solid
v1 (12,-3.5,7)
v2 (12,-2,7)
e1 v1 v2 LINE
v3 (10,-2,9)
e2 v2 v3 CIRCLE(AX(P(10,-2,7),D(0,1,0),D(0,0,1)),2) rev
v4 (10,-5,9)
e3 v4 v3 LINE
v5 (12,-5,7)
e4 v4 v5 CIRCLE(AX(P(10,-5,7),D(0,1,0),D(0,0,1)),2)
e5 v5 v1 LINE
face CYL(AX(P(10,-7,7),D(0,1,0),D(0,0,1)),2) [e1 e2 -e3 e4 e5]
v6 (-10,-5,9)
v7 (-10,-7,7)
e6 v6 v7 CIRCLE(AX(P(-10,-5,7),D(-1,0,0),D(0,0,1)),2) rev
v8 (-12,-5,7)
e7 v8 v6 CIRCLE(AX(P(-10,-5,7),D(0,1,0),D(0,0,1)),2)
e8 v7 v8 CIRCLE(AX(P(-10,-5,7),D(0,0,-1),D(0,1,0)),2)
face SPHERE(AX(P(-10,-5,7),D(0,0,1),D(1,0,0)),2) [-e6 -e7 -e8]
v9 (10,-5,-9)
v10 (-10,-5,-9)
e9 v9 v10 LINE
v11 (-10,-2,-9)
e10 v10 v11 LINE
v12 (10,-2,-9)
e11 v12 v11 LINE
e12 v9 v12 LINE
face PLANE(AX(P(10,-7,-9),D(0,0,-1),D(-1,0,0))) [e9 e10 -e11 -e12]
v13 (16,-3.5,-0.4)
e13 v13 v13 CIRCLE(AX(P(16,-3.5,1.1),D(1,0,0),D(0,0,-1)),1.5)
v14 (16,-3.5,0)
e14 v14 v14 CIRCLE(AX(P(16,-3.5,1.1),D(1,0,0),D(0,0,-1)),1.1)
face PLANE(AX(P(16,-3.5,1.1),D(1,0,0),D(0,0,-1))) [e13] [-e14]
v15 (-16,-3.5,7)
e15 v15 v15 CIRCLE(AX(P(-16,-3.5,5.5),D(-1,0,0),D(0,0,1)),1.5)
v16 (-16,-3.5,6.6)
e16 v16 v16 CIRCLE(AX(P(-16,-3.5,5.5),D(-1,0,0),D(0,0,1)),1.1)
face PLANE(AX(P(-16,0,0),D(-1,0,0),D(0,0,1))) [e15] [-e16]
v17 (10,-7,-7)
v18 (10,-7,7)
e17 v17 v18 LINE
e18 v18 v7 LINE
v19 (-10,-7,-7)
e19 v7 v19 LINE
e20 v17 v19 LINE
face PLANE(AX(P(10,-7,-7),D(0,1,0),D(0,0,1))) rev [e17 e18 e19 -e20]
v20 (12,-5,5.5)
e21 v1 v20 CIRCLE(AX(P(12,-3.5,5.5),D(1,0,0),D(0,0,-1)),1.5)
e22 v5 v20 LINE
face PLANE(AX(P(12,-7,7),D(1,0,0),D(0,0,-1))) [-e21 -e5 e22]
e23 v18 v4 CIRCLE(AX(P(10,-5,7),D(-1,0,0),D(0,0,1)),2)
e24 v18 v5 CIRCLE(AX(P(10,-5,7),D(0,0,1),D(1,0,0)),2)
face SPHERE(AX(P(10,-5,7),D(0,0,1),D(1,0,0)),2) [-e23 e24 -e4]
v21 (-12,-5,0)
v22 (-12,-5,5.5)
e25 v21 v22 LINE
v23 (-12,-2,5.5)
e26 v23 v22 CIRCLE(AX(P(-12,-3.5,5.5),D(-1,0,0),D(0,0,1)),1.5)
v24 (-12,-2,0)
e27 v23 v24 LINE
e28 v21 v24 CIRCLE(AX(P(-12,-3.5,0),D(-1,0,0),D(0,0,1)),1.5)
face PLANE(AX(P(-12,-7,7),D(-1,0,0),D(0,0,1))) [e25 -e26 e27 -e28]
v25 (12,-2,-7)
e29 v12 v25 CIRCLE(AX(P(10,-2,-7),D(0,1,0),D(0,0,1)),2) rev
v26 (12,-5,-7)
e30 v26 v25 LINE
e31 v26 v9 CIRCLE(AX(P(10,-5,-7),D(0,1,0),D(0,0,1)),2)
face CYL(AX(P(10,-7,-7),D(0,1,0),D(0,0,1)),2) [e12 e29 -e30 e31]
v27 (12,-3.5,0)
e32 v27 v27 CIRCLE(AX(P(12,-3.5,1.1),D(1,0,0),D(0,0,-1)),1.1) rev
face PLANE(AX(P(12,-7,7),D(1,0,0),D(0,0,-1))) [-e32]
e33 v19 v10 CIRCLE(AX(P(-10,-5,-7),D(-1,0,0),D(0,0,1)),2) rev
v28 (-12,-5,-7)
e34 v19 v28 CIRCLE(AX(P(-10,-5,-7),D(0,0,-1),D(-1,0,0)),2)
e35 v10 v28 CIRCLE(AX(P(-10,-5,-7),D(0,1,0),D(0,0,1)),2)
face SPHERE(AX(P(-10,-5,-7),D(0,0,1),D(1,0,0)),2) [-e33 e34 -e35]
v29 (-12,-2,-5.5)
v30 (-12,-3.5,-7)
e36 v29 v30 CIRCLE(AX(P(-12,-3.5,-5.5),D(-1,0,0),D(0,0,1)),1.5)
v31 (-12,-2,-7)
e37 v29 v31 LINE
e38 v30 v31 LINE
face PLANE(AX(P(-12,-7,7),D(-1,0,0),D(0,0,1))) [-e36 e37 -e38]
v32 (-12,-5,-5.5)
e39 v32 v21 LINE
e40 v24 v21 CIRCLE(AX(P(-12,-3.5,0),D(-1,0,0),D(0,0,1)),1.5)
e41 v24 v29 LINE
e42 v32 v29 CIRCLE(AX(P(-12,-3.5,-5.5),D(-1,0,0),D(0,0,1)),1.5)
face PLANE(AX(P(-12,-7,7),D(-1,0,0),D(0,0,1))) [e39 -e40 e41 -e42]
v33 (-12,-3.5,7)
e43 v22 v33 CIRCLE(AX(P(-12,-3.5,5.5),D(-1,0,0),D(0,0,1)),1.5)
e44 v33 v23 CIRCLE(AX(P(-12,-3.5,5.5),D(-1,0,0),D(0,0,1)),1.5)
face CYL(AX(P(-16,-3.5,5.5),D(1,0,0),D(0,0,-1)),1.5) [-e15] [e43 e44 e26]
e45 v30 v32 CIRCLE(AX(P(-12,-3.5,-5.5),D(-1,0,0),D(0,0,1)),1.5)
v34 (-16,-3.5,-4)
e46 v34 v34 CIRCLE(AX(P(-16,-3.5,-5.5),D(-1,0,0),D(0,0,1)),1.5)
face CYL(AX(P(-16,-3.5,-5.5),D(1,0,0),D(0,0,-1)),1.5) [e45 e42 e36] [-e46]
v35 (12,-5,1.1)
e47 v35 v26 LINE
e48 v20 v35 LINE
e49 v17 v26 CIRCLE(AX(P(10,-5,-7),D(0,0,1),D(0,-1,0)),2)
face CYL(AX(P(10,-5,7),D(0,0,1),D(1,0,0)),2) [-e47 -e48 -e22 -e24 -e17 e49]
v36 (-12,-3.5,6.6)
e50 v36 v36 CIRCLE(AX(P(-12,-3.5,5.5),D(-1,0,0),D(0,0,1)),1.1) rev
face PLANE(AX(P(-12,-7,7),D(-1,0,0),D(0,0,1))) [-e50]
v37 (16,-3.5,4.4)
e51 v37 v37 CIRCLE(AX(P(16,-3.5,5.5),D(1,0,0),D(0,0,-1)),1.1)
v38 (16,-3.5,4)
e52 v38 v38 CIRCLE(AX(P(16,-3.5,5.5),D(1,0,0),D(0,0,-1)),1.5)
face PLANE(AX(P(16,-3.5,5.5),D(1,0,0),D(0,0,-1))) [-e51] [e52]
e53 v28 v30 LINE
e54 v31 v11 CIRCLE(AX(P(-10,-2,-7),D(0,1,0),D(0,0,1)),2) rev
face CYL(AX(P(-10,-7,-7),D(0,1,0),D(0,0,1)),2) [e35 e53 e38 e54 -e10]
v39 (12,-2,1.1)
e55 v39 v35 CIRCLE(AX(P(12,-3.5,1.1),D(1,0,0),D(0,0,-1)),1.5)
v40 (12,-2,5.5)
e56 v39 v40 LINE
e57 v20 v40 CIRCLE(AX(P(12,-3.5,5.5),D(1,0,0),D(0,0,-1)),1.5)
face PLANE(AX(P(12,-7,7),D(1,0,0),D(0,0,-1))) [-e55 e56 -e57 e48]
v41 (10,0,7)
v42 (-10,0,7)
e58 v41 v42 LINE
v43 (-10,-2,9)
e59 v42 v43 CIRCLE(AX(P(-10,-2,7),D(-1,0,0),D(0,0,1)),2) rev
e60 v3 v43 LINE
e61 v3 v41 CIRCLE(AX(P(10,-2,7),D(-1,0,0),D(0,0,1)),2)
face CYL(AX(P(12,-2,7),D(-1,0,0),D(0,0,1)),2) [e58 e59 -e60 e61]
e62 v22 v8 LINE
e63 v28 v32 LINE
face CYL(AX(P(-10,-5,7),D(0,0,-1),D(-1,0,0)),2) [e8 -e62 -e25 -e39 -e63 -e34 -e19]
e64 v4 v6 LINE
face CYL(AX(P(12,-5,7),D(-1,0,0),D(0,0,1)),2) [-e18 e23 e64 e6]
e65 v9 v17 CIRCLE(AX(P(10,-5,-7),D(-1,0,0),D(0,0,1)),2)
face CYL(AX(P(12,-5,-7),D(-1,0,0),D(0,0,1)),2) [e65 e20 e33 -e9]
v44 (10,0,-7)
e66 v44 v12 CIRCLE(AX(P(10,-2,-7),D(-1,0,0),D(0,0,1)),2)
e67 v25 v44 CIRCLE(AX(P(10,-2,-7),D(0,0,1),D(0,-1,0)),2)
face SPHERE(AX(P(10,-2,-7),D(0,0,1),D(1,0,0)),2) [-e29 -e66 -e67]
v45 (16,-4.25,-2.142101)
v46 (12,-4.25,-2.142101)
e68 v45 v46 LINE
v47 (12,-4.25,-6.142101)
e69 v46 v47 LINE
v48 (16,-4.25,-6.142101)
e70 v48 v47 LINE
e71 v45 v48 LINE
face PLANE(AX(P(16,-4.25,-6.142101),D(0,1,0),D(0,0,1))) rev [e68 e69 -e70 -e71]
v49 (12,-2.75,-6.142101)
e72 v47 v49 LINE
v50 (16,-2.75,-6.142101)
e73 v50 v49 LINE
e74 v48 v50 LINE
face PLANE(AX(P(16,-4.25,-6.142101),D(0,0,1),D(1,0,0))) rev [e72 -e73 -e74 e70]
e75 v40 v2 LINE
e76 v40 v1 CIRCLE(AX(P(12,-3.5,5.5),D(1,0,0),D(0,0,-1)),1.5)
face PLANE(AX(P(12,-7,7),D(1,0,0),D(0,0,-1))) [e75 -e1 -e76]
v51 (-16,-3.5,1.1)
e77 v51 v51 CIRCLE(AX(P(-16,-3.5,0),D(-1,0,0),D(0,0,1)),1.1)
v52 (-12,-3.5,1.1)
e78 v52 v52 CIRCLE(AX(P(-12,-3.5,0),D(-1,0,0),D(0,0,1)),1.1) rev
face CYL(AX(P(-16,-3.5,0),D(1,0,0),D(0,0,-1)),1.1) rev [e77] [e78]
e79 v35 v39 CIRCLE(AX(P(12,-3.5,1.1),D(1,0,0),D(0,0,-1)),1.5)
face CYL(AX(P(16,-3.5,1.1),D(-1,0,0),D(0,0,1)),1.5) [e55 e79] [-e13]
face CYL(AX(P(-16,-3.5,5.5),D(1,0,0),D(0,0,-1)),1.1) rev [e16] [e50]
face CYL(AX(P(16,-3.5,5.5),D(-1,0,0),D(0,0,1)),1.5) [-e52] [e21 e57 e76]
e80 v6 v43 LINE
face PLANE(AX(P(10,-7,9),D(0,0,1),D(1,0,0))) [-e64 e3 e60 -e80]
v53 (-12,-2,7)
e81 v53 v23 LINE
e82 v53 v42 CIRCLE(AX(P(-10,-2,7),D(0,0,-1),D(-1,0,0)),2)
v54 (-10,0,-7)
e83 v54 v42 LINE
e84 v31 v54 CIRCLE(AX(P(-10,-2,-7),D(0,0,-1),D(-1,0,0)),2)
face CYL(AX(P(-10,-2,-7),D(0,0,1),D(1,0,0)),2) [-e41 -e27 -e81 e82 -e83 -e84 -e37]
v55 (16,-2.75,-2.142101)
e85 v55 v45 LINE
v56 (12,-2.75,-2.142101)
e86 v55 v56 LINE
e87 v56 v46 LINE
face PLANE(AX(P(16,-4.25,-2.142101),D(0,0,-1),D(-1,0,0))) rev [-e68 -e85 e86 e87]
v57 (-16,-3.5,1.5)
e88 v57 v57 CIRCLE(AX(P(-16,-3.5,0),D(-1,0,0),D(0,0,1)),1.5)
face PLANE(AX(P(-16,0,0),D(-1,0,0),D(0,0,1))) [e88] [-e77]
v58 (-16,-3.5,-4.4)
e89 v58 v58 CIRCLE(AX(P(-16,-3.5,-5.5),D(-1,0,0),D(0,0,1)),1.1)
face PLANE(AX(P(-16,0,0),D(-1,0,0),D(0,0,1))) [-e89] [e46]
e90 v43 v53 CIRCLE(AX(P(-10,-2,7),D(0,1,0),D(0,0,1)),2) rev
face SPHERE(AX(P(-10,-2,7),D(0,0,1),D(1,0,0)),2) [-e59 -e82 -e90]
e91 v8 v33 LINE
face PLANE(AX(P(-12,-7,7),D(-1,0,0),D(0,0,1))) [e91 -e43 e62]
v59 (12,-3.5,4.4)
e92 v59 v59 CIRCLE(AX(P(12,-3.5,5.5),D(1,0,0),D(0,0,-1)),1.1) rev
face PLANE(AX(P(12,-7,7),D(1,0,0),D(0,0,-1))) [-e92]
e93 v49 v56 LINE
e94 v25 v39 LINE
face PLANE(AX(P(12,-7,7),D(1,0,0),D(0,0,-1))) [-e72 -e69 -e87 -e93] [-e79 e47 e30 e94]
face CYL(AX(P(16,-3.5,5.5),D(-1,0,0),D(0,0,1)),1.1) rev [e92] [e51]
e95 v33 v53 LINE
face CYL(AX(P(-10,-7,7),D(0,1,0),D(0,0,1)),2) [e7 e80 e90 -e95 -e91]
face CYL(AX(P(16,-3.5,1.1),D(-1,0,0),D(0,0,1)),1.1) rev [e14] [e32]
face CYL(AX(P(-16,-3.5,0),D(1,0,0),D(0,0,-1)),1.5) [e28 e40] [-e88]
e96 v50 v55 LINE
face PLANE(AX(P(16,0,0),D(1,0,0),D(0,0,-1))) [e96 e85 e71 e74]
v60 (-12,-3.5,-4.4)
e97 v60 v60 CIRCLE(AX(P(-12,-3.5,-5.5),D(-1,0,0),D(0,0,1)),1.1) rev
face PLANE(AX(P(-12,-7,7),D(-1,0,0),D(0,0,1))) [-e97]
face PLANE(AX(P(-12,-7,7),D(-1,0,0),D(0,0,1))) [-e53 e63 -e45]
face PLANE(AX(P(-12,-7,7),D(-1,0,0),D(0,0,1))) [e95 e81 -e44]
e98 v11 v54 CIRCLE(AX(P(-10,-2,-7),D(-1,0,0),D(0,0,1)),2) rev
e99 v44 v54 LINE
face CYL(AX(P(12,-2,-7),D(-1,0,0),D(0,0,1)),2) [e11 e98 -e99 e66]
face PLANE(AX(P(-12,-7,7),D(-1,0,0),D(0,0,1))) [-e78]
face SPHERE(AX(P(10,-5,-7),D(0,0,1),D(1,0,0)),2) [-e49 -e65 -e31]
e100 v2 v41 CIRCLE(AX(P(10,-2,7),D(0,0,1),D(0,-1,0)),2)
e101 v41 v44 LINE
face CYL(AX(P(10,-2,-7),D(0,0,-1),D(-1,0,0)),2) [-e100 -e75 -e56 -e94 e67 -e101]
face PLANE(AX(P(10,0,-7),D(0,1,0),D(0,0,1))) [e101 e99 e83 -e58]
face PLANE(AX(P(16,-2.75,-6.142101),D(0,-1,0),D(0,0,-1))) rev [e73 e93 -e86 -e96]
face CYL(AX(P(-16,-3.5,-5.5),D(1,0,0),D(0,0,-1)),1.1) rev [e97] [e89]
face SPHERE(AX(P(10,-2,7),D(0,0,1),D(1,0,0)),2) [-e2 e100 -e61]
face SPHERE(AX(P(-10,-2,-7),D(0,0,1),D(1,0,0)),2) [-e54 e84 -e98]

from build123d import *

# Parameters (mm, degrees)
BOSS_EXTRUDE1_DEPTH = 7
CUT_EXTRUDE3_DEPTH  = 27.570660511
SKETCH7_R           = 1.5
SKETCH7_R_2         = 1.1
BOSS_EXTRUDE3_DEPTH = 4
BOSS_EXTRUDE4_START = 4
SKETCH8_R           = 1.5
SKETCH8_R_2         = 1.1
SKETCH8_W           = 4
SKETCH8_H           = 1.5
BOSS_EXTRUDE4_DEPTH = 4
FILLET1_R           = 2


with BuildPart() as part:
    # Sketch1 → Boss-Extrude1 (new body)
    with BuildSketch(Plane(origin=(0, 0, 0), x_dir=(1, 0, 0), z_dir=(0, 1, 0))):
        with BuildLine():
            Line((10, -9), (-10, -9))
            ThreePointArc((-10, -9), (-11.414213562, -8.414213562), (-12, -7))
            Line((-12, -7), (-12, 7))
            ThreePointArc((-12, 7), (-11.414213562, 8.414213562), (-10, 9))
            Line((-10, 9), (10, 9))
            ThreePointArc((10, 9), (11.414213562, 8.414213562), (12, 7))
            Line((12, 7), (12, -7))
            ThreePointArc((12, -7), (11.414213562, -8.414213562), (10, -9))
        make_face()
    extrude(amount=-BOSS_EXTRUDE1_DEPTH)

    # Sketch5 → Cut-Extrude3 (cut, through all)
    with BuildSketch(Plane.ZY.offset(12)):
        with BuildLine():
            ThreePointArc((-7, 0), (-8.414213562, -0.585786438), (-9, -2))
            Line((-9, -2), (-9, 0))
            Line((-9, 0), (-7, 0))
        make_face()
        with BuildLine():
            ThreePointArc((-9, -5), (-8.414213562, -6.414213562), (-7, -7))
            Line((-7, -7), (-9, -7))
            Line((-9, -7), (-9, -5))
        make_face()
        with BuildLine():
            ThreePointArc((7, -7), (8.414213562, -6.414213562), (9, -5))
            Line((9, -5), (9, -7))
            Line((9, -7), (7, -7))
        make_face()
        with BuildLine():
            Line((7, 0), (9, 0))
            Line((9, 0), (9, -2))
            ThreePointArc((9, -2), (8.414213562, -0.585786438), (7, 0))
        make_face()
    extrude(amount=-CUT_EXTRUDE3_DEPTH, mode=Mode.SUBTRACT)

    # Sketch7 → Boss-Extrude3 (add)
    # profile 1 of 3: a face of its own
    with BuildSketch(Plane.ZY.offset(12)):
        with Locations(Location((-5.5, -3.5, 0), (0, 0, 180))):
            Circle(SKETCH7_R)
        with Locations((-5.5, -3.5)):
            Circle(SKETCH7_R_2, mode=Mode.SUBTRACT)
    # profile 2 of 3: a face of its own
    with BuildSketch(Plane.ZY.offset(12)):
        with Locations((0, -3.5)):
            Circle(SKETCH7_R)
        with Locations((0, -3.5)):
            Circle(SKETCH7_R_2, mode=Mode.SUBTRACT)
    # profile 3 of 3: a face of its own
    with BuildSketch(Plane.ZY.offset(12)):
        with Locations((5.5, -3.5)):
            Circle(SKETCH7_R)
        with Locations((5.5, -3.5)):
            Circle(SKETCH7_R_2, mode=Mode.SUBTRACT)
    extrude(amount=BOSS_EXTRUDE3_DEPTH)

    # Sketch8 → Boss-Extrude4 (add)
    # profile 1 of 3: a face of its own
    with BuildSketch(Plane(origin=(12, 0, 0), x_dir=(0, 0, -1), z_dir=(1, 0, 0)).offset(BOSS_EXTRUDE4_START)):
        with Locations(Location((-5.5, -3.5, 0), (0, 0, 180))):
            Circle(SKETCH8_R)
        with Locations(Location((-5.5, -3.5, 0), (0, 0, 180))):
            Circle(SKETCH8_R_2, mode=Mode.SUBTRACT)
    # profile 2 of 3: a face of its own
    with BuildSketch(Plane(origin=(12, 0, 0), x_dir=(0, 0, -1), z_dir=(1, 0, 0)).offset(BOSS_EXTRUDE4_START)):
        with Locations((-1.1, -3.5)):
            Circle(SKETCH8_R)
        with Locations((-1.1, -3.5)):
            Circle(SKETCH8_R_2, mode=Mode.SUBTRACT)
    # profile 3 of 3: a face of its own
    with BuildSketch(Plane(origin=(12, 0, 0), x_dir=(0, 0, -1), z_dir=(1, 0, 0)).offset(BOSS_EXTRUDE4_START)):
        with Locations((4.14210092, -3.5)):
            Rectangle(SKETCH8_W, SKETCH8_H)
    extrude(amount=-BOSS_EXTRUDE4_DEPTH)

    # Fillet1
    # the kernel refuses this fillet: 2 mm, written as the material it takes off along each edge
    with BuildSketch(Plane(origin=(10, -2, 7), x_dir=(1, 0, 0), z_dir=(0, 1, 0))) as fillet1_piece_1_section:
        Polygon((0, 0), (FILLET1_R, 0), (FILLET1_R, -FILLET1_R), (0, -FILLET1_R), align=None)
    fillet1_piece_1 = extrude(amount=FILLET1_R, mode=Mode.PRIVATE)
    fillet1_piece_1 = fillet1_piece_1 - Plane(origin=(10, -2, 7), x_dir=(-0.7071067811865475, 0, -0.7071067811865475), z_dir=(0, 1, 0)) * Sphere(FILLET1_R, mode=Mode.PRIVATE)
    add(fillet1_piece_1, mode=Mode.SUBTRACT)
    with BuildSketch(Plane(origin=(-10, -2, 7), x_dir=(-1, 0, 0), z_dir=(0, 1, 0))) as fillet1_piece_2_section:
        Polygon((0, 0), (FILLET1_R, 0), (FILLET1_R, FILLET1_R), (0, FILLET1_R), align=None)
    fillet1_piece_2 = extrude(amount=FILLET1_R, mode=Mode.PRIVATE)
    fillet1_piece_2 = fillet1_piece_2 - Plane(origin=(-10, -2, 7), x_dir=(0.7071067811865475, 0, -0.7071067811865475), z_dir=(0, 1, 0)) * Sphere(FILLET1_R, mode=Mode.PRIVATE)
    add(fillet1_piece_2, mode=Mode.SUBTRACT)
    with BuildSketch(Plane(origin=(10, -5, 7), x_dir=(1, 0, 0), z_dir=(0, -1, 0))) as fillet1_piece_3_section:
        Polygon((0, 0), (FILLET1_R, 0), (FILLET1_R, FILLET1_R), (0, FILLET1_R), align=None)
    fillet1_piece_3 = extrude(amount=FILLET1_R, mode=Mode.PRIVATE)
    fillet1_piece_3 = fillet1_piece_3 - Plane(origin=(10, -5, 7), x_dir=(-0.7071067811865475, 0, -0.7071067811865475), z_dir=(0, -1, 0)) * Sphere(FILLET1_R, mode=Mode.PRIVATE)
    add(fillet1_piece_3, mode=Mode.SUBTRACT)
    with BuildSketch(Plane(origin=(-10, -5, 7), x_dir=(0, -1, 0), z_dir=(-1, 0, 0))) as fillet1_piece_4_section:
        Polygon((0, 0), (FILLET1_R, 0), (FILLET1_R, FILLET1_R), (0, FILLET1_R), align=None)
    fillet1_piece_4 = extrude(amount=FILLET1_R, mode=Mode.PRIVATE)
    fillet1_piece_4 = fillet1_piece_4 - Plane(origin=(-10, -5, 7), x_dir=(0, 0.7071067811865475, -0.7071067811865475), z_dir=(-1, 0, 0)) * Sphere(FILLET1_R, mode=Mode.PRIVATE)
    add(fillet1_piece_4, mode=Mode.SUBTRACT)
    with BuildSketch(Plane(origin=(10, -5, -7), x_dir=(1, 0, 0), z_dir=(0, -1, 0))) as fillet1_piece_5_section:
        Polygon((0, 0), (FILLET1_R, 0), (FILLET1_R, -FILLET1_R), (0, -FILLET1_R), align=None)
    fillet1_piece_5 = extrude(amount=FILLET1_R, mode=Mode.PRIVATE)
    fillet1_piece_5 = fillet1_piece_5 - Plane(origin=(10, -5, -7), x_dir=(-0.7071067811865475, 0, 0.7071067811865476), z_dir=(0, -1, 0)) * Sphere(FILLET1_R, mode=Mode.PRIVATE)
    add(fillet1_piece_5, mode=Mode.SUBTRACT)
    with BuildSketch(Plane(origin=(-10, -5, -7), x_dir=(0, -1, 0), z_dir=(-1, 0, 0))) as fillet1_piece_6_section:
        Polygon((0, 0), (FILLET1_R, 0), (FILLET1_R, -FILLET1_R), (0, -FILLET1_R), align=None)
    fillet1_piece_6 = extrude(amount=FILLET1_R, mode=Mode.PRIVATE)
    fillet1_piece_6 = fillet1_piece_6 - Plane(origin=(-10, -5, -7), x_dir=(0, 0.7071067811865475, 0.7071067811865475), z_dir=(-1, 0, 0)) * Sphere(FILLET1_R, mode=Mode.PRIVATE)
    add(fillet1_piece_6, mode=Mode.SUBTRACT)
    with BuildSketch(Plane(origin=(10, -2, -7), x_dir=(1, 0, 0), z_dir=(0, 1, 0))) as fillet1_piece_7_section:
        Polygon((0, 0), (FILLET1_R, 0), (FILLET1_R, FILLET1_R), (0, FILLET1_R), align=None)
    fillet1_piece_7 = extrude(amount=FILLET1_R, mode=Mode.PRIVATE)
    fillet1_piece_7 = fillet1_piece_7 - Plane(origin=(10, -2, -7), x_dir=(-0.7071067811865475, 0, 0.7071067811865476), z_dir=(0, 1, 0)) * Sphere(FILLET1_R, mode=Mode.PRIVATE)
    add(fillet1_piece_7, mode=Mode.SUBTRACT)
    with BuildSketch(Plane(origin=(-10, -2, -7), x_dir=(-1, 0, 0), z_dir=(0, 1, 0))) as fillet1_piece_8_section:
        Polygon((0, 0), (FILLET1_R, 0), (FILLET1_R, -FILLET1_R), (0, -FILLET1_R), align=None)
    fillet1_piece_8 = extrude(amount=FILLET1_R, mode=Mode.PRIVATE)
    fillet1_piece_8 = fillet1_piece_8 - Plane(origin=(-10, -2, -7), x_dir=(0.7071067811865475, 0, 0.7071067811865475), z_dir=(0, 1, 0)) * Sphere(FILLET1_R, mode=Mode.PRIVATE)
    add(fillet1_piece_8, mode=Mode.SUBTRACT)
    with BuildSketch(Plane(origin=(-12, 0, 7), x_dir=(1, 0, 0), z_dir=(0, 0, -1)), Plane(origin=(-12, -7, 7), x_dir=(0, 1, 0), z_dir=(0, 0, -1)), Plane(origin=(12, 0, -7), x_dir=(-1, 0, 0), z_dir=(0, 0, 1))) as fillet1_piece_9:
        with BuildLine():
            CenterArc((FILLET1_R, FILLET1_R), FILLET1_R, 180, 90)
            Line((0, FILLET1_R), (0, 0))
            Line((0, 0), (FILLET1_R, 0))
        make_face()
    extrude(amount=14, mode=Mode.SUBTRACT)
    with BuildSketch(Plane(origin=(12, -7, -7), x_dir=(-1, 0, 0), z_dir=(0, 0, 1))) as fillet1_piece_10:
        with BuildLine():
            CenterArc((FILLET1_R, -FILLET1_R), FILLET1_R, 90, 90)
            Line((0, -FILLET1_R), (0, 0))
            Line((0, 0), (FILLET1_R, 0))
        make_face()
    extrude(amount=14, mode=Mode.SUBTRACT)


solid = part.part
